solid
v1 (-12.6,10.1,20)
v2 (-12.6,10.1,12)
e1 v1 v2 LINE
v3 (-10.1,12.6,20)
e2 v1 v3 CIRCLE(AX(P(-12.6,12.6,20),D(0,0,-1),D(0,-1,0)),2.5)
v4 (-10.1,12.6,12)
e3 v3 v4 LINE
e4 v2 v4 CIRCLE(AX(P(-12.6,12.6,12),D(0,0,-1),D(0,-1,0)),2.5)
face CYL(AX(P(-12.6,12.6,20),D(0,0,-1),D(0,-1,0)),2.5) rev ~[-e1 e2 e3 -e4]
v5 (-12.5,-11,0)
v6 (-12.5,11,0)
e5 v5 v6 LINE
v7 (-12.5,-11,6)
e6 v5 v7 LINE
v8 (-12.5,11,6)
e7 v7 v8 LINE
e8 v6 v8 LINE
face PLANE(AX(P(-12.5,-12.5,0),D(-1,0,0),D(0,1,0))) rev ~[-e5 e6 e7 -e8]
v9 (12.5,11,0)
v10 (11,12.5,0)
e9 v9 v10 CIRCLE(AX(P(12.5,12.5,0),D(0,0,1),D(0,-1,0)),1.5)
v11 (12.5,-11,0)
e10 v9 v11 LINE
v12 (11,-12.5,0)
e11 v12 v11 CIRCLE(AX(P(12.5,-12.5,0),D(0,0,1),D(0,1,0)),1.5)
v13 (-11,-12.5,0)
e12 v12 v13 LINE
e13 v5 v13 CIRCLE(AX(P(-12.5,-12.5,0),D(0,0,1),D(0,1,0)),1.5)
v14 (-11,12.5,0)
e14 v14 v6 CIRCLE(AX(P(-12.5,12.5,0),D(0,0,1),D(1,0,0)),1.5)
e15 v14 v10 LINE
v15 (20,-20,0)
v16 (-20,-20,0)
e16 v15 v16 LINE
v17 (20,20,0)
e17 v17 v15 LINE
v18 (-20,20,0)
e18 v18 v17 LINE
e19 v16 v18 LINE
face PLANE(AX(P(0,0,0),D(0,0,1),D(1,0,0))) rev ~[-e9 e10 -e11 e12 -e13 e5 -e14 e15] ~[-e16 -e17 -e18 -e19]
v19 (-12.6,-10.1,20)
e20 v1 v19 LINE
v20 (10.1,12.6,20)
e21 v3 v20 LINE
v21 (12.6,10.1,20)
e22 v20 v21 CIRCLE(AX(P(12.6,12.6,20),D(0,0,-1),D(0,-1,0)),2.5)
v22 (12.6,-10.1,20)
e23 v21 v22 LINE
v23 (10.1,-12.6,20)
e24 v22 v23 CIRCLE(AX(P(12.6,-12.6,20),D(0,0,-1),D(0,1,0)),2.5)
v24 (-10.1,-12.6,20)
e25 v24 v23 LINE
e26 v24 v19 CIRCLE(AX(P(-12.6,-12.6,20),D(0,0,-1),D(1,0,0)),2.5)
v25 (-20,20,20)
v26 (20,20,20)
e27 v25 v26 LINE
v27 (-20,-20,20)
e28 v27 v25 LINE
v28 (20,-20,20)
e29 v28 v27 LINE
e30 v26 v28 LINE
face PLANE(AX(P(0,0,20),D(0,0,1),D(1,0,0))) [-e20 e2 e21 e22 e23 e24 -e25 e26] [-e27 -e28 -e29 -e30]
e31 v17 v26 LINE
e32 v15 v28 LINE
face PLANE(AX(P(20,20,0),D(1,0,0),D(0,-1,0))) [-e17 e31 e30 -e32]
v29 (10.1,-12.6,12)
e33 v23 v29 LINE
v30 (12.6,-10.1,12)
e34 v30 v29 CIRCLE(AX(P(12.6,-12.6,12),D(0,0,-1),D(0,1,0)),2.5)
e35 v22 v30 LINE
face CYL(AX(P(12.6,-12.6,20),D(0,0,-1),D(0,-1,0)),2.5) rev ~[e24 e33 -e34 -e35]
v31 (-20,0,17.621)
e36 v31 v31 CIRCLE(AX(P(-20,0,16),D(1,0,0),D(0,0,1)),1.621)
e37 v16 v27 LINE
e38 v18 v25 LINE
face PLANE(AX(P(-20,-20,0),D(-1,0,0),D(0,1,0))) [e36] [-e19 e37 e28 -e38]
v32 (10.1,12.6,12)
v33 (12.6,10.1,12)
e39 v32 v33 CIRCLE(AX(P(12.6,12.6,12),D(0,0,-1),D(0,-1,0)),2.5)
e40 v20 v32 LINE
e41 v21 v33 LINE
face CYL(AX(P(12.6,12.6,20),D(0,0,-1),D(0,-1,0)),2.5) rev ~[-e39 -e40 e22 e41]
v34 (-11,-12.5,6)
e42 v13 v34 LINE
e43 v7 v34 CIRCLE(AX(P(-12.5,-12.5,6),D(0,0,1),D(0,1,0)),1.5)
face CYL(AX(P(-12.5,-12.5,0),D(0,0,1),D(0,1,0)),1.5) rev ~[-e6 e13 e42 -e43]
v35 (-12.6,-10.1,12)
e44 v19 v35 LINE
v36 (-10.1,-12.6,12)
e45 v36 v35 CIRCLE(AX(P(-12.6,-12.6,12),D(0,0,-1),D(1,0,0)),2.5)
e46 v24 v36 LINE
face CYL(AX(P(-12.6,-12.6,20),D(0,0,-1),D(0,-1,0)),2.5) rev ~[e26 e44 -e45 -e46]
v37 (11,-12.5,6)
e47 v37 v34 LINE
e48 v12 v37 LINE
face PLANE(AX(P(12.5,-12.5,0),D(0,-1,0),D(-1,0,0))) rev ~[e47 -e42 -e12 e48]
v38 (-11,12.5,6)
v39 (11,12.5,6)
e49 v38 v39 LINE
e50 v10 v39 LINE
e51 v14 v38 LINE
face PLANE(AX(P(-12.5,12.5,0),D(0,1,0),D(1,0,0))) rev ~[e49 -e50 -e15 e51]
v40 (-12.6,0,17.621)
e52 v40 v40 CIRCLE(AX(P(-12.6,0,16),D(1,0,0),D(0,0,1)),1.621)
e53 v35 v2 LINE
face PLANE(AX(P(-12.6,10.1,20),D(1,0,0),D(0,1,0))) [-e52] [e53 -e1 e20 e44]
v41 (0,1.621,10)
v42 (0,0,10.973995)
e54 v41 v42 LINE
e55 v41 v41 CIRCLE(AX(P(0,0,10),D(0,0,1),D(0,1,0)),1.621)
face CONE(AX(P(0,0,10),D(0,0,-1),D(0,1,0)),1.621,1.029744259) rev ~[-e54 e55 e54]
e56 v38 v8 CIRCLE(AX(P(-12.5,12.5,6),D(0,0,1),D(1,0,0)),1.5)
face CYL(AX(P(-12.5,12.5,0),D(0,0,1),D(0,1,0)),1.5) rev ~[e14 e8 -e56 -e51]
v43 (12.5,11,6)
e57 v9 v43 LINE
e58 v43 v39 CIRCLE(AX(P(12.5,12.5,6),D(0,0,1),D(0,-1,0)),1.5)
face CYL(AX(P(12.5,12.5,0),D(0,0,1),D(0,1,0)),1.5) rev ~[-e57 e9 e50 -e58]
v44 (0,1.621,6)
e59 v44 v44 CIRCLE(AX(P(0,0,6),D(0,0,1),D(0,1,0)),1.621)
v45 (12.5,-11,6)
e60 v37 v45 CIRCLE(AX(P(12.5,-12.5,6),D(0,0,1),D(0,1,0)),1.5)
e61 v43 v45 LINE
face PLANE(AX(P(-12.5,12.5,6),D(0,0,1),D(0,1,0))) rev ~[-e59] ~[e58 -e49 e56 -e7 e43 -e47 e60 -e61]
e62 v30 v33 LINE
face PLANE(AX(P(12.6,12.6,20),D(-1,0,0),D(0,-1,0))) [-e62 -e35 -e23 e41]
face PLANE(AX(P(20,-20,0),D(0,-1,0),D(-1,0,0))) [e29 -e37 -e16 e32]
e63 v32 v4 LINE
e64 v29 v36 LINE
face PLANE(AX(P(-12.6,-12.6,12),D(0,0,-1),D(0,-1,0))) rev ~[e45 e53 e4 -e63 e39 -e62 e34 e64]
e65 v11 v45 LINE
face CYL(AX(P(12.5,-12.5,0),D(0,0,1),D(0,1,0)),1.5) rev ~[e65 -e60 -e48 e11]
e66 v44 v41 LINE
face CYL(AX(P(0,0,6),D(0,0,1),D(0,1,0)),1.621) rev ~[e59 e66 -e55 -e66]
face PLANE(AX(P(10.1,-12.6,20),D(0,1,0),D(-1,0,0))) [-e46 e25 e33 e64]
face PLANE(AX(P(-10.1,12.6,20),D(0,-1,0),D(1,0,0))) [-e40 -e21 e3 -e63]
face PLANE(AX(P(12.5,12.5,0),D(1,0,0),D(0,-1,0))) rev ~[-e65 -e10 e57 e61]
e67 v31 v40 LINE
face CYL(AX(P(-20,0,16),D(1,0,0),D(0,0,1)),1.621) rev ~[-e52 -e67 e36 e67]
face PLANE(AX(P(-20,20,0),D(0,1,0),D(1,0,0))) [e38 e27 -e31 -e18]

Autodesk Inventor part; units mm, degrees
ref_plane "YZ Plane" through (0, 0, 0) normal (1, 0, 0) x (0, 1, 0)
ref_plane "XZ Plane" through (0, 0, 0) normal (0, 1, 0) x (-1, 0, 0)
ref_plane "XY Plane" through (0, 0, 0) normal (0, 0, 1) x (1, 0, 0)
sketch "Sketch1" plane through (0, 0, 0) normal (0, 0, 1) x (1, 0, 0)
  line L0 (0, 28) -> (0, -28) construction
  line L1 (-28, 0) -> (28, 0) construction
  line L2 (-20, 20) -> (20, 20)
  line L3 (20, 20) -> (20, -20)
  line L4 (20, -20) -> (-20, -20)
  line L5 (-20, -20) -> (-20, 20)
  point P0 (0, 0)
  dimension "d0" = 40
  dimension "d1" = 40
extrude "Extrusion1" add sketch "Sketch1" along normal blind 20
sketch "Sketch4" plane through (0, 0, 20) normal (0, 0, 1) x (1, 0, 0)
  line L0 (-28, 0) -> (28, 0) construction
  line L1 (0, 28) -> (0, -28) construction
  line L2 (-12.6, 12.6) -> (12.6, 12.6) construction
  line L3 (12.6, 12.6) -> (12.6, -12.6) construction
  line L4 (12.6, -12.6) -> (-12.6, -12.6) construction
  line L5 (-12.6, -12.6) -> (-12.6, 12.6) construction
  point P0 (0, 0)
  dimension "d15" = 25.2
  dimension "d16" = 25.2
hole "Hole2" at (-12.6, 12.6, 20) at (12.6, 12.6, 20) at (12.6, -12.6, 20) at (-12.6, -12.6, 20) at (-12.6, 12.6, 20) at (12.6, 12.6, 20) direction (0, 0, -1) diameter 5 depth 8
sketch "Sketch5" plane through (0, 0, 20) normal (0, 0, 1) x (1, 0, 0)
  circle A0 centre (-12.6, 12.6) radius 2.5 projected
  circle A1 centre (12.6, -12.6) radius 2.5 projected
  line L0 (-12.6, 12.6) -> (12.6, 12.6)
  line L1 (12.6, 12.6) -> (12.6, -12.6)
  line L2 (12.6, -12.6) -> (-12.6, -12.6)
  line L3 (-12.6, -12.6) -> (-12.6, 12.6)
  point P0 (0, 0)
extrude "Extrusion3" cut sketch "Sketch5" against normal blind 8 contours L0 L1 A1 L2 L3 A0 | A0 L3 L0 | L1 L2 A1 picked at (-10.9542, 12.4146) picked at (11.1977, -11.7189)
sketch "Sketch6" plane through (-20, -20, 0) normal (-1, 0, 0) x (0, 0, 1)
  line L0 (0, 40) -> (20, 40) projected
  line L1 (20, 9.9) -> (12, 9.9) construction
  line L2 (20, 30.1) -> (20, 9.9) construction
  line L3 (12, 30.1) -> (20, 30.1) construction
  line L4 (12, 9.9) -> (12, 30.1) construction
  line L5 (16, 30.1) -> (16, 9.9) construction
  point P0 (0, 20)
  point P1 (16, 20)
  dimension "d27" = 20
hole "Hole3" at (-20, 0, 16) direction (1, 0, 0) diameter 3.242 end up to surface thread size "M4x0.7" class "6H" standard "ANSI Metric M Profile"
sketch "Sketch8" plane through (0, 0, 0) normal (0, 0, -1) x (-1, 0, 0)
  line L0 (20, 20) -> (-20, 20) construction
  line L1 (-20, 20) -> (-20, -20) construction
  line L2 (-20, -20) -> (20, -20) construction
  line L3 (20, -20) -> (20, 20) construction
  line L4 (0, -31.5) -> (0, 31.5) construction
  line L5 (-28, 0) -> (28, 0) construction
  line L6 (-12.5, -12.5) -> (12.5, -12.5)
  line L7 (12.5, -12.5) -> (12.5, 12.5)
  line L8 (12.5, 12.5) -> (-12.5, 12.5)
  line L9 (-12.5, 12.5) -> (-12.5, -12.5)
  point P0 (0, 0)
  dimension "d44" = 25
  dimension "d45" = 25
extrude "Extrusion4" cut sketch "Sketch8" against normal blind 6
sketch "Sketch9" plane through (0, 0, 0) normal (0, 0, -1) x (-1, 0, 0)
  line L0 (12.5, 12.5) -> (12.5, -12.5) construction
  line L1 (12.5, -12.5) -> (-12.5, -12.5) construction
  line L2 (-12.5, -12.5) -> (-12.5, 12.5) construction
  line L3 (-12.5, 12.5) -> (12.5, 12.5) construction
  line L4 (20, 20) -> (-20, 20) construction
  line L5 (-20, 20) -> (-20, -20) construction
  line L6 (-20, -20) -> (20, -20) construction
  line L7 (20, -20) -> (20, 20) construction
  line L8 (12.5, -12.5) -> (-12.5, -12.5) construction
  point P0 (0, 0)
hole "Hole5" at (-12.5, 12.5, 0) at (-12.5, -12.5, 0) at (12.5, -12.5, 0) at (12.5, 12.5, 0) direction (0, 0, 1) diameter 3 depth 6
sketch "Sketch10" plane through (0, 0, 6) normal (0, 0, -1) x (-1, 0, 0)
  point P0 (0, 0)
  point P1 (0, 0)
hole "Hole6" at (0, 0, 6) direction (0, 0, 1) diameter 3.242 depth 4 tip angle 118 thread size "M4x0.7" class "6H" standard "ANSI Metric M Profile"
equation "\"d27\" = 0.5 * d0"
properties part number "Large-cuvette-mount-25mm-V3" material "PC/ABS Plastic"
